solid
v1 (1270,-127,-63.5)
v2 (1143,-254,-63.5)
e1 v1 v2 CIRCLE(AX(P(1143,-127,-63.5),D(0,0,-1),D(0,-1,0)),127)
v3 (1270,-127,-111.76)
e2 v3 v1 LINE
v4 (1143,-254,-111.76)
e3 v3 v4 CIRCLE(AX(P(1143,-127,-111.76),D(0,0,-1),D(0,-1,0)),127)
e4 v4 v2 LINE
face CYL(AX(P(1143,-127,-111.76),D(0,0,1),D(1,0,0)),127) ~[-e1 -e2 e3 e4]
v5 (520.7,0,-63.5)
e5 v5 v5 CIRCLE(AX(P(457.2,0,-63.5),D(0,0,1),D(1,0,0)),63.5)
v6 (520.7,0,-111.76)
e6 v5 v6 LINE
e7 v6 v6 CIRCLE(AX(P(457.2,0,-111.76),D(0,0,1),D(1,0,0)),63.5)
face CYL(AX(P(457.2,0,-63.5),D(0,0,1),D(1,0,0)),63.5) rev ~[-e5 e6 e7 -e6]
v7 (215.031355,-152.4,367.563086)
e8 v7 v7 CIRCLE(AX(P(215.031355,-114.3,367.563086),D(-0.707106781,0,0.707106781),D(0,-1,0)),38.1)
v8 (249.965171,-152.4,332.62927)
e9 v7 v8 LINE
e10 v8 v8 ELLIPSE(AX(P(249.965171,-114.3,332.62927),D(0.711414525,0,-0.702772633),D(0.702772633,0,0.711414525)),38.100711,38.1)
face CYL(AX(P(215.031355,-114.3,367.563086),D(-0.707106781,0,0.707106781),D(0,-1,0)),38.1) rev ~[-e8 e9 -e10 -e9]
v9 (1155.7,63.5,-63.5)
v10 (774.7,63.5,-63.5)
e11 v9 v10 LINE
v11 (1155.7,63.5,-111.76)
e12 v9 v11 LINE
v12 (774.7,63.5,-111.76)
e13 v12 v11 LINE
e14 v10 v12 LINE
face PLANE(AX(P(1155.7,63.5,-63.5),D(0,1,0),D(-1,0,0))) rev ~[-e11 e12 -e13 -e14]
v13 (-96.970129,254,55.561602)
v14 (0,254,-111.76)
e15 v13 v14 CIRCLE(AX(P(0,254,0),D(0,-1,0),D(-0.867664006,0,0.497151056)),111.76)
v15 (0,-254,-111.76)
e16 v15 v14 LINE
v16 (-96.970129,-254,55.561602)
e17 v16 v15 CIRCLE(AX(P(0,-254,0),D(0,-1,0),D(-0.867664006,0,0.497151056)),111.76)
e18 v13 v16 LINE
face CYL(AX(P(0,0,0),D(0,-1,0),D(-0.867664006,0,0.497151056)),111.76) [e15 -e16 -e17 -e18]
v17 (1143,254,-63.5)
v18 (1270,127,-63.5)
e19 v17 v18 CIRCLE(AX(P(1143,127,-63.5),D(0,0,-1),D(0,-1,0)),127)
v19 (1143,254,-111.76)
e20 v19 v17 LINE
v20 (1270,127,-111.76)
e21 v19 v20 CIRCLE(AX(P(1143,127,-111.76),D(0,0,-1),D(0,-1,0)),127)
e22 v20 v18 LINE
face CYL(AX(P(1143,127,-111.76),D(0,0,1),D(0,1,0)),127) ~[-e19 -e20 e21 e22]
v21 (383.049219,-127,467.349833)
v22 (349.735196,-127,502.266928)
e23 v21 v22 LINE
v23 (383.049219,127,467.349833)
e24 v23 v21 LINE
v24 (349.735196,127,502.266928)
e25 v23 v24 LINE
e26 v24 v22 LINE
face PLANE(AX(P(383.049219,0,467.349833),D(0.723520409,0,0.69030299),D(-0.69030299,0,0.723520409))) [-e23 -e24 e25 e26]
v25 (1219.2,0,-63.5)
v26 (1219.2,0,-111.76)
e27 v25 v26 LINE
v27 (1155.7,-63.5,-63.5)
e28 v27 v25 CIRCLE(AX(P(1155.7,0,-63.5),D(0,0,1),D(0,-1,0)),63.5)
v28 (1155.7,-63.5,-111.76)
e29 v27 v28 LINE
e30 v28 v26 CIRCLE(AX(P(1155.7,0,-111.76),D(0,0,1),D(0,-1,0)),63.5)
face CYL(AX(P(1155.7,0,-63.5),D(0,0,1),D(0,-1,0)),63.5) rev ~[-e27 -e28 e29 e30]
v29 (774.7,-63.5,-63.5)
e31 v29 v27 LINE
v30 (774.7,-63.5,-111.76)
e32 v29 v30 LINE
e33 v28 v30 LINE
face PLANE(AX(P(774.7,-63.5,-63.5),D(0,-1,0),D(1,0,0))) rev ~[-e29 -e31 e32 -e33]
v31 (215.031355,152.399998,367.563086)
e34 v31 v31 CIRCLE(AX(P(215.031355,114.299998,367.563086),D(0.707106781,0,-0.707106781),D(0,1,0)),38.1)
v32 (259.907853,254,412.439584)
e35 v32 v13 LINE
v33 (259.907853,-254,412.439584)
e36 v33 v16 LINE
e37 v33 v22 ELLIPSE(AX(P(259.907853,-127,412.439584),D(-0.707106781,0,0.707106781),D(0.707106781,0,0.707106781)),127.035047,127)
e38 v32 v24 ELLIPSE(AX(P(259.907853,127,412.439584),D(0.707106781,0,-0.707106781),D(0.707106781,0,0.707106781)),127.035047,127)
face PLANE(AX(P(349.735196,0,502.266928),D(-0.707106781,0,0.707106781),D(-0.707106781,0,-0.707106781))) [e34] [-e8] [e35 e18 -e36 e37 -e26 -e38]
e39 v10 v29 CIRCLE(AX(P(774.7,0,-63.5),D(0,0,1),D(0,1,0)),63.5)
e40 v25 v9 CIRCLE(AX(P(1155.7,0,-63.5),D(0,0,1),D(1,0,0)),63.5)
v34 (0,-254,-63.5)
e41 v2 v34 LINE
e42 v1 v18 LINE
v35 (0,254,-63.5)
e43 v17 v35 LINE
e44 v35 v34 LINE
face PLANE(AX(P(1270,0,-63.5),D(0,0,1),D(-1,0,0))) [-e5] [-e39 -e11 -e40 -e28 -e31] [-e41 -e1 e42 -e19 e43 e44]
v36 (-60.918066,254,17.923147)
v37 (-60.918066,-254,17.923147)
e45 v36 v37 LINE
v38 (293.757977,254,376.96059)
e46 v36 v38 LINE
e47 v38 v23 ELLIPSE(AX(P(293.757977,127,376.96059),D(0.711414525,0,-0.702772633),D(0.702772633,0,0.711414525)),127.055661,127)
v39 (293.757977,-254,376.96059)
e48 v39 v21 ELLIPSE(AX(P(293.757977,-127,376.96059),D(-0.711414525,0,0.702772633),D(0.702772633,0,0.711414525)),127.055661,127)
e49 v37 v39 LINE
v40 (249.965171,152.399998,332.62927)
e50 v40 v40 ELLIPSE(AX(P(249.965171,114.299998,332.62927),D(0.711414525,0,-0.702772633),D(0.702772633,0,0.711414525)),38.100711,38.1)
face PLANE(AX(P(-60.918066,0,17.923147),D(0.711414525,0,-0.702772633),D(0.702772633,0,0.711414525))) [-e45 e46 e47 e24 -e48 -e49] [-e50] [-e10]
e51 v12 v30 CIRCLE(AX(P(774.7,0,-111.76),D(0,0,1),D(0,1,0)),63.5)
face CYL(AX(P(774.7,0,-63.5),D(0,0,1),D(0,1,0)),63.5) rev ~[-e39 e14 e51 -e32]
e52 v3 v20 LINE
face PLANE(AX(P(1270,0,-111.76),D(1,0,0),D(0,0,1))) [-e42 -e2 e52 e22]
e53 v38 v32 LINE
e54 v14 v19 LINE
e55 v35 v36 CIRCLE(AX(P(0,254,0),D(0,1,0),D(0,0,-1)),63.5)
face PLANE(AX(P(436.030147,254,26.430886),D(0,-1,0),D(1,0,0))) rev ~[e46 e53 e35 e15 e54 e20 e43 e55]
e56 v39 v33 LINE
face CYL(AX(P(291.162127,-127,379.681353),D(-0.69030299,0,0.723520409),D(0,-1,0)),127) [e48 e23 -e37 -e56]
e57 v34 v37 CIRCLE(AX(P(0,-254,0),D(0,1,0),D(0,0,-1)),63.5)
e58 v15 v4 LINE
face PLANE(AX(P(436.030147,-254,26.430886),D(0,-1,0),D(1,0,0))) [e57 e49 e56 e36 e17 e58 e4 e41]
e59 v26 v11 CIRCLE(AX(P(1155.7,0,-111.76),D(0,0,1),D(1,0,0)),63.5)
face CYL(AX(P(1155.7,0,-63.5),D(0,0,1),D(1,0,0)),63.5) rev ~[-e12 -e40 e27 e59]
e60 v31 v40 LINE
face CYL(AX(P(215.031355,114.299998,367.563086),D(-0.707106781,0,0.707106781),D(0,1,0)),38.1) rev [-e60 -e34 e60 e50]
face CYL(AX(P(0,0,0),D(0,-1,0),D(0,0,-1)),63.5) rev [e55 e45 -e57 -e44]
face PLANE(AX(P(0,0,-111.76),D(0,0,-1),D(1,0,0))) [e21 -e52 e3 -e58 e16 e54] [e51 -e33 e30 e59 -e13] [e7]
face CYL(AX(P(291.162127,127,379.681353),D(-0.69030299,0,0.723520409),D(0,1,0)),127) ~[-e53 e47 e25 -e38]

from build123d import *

# Parameters (mm, degrees)
F1_DEPTH = 254
F2_R     = 63.5
F3_DEPTH = 48.261
F4_R     = 38.1
F5_DEPTH = 49.6377001669
F6_R     = 127
F7_R     = 127


# Not quite as in the source:
# - a pattern or mirror of a feature is missing from the dataset's text; its kind, count and spacing are read off the source's solid


with BuildPart() as f1:
    # F0 (on Front) → F1 (new body, symmetric)
    with BuildSketch(Plane.XZ):
        with BuildLine():
            Line((1270, -63.5), (0, -63.5))
            ThreePointArc((0, -63.5), (-50.8447137485, -38.0403086717), (-60.9180663091, 17.9231469658))
            Line((-60.9180663091, 17.9231469658), (383.0492185975, 467.3498327088))
            Line((383.0492185975, 467.3498327088), (349.7351963182, 502.2669276563))
            Line((349.7351963182, 502.2669276563), (-96.9701293302, 55.5616020078))
            ThreePointArc((-96.9701293302, 55.5616020078), (-96.6950418594, -56.0389728653), (0, -111.76))
            Line((0, -111.76), (1270, -111.76))
            Line((1270, -111.76), (1270, -63.5))
        make_face()
    extrude(amount=F1_DEPTH, both=True)

    # F2 (on face) → F3 (cut, through all)
    with BuildSketch(Plane.XY.offset(-63.5)):
        with BuildLine():
            ThreePointArc((1155.7, -63.5), (1200.6012806053, -44.9012806053), (1219.2, 0))
            ThreePointArc((1219.2, 0), (1200.6012806053, 44.9012806053), (1155.7, 63.5))
            ThreePointArc((1155.7, 63.5), (1092.2, 0), (1155.7, -63.5))
        make_face()
        with BuildLine():
            ThreePointArc((1155.7, -63.5), (1092.2, 0), (1155.7, 63.5))
            Line((1155.7, 63.5), (774.7, 63.5))
            ThreePointArc((774.7, 63.5), (819.6012806053, 44.9012806053), (838.2, 0))
            ThreePointArc((838.2, 0), (819.6012806053, -44.9012806053), (774.7, -63.5))
            Line((774.7, -63.5), (1155.7, -63.5))
        make_face()
        with BuildLine():
            ThreePointArc((838.2, 0), (819.6012806053, 44.9012806053), (774.7, 63.5))
            ThreePointArc((774.7, 63.5), (711.2, 0), (774.7, -63.5))
            ThreePointArc((774.7, -63.5), (819.6012806053, -44.9012806053), (838.2, 0))
        make_face()
        with Locations((457.2, 0)):
            Circle(F2_R)
    extrude(amount=-F3_DEPTH, mode=Mode.SUBTRACT)

    # F4 (on face) → F5 (cut, through all)
    with BuildSketch(Plane(origin=(-76.265865669, 0, 76.265865669), x_dir=(0, -1, 0), z_dir=(-0.7071067812, 0, 0.7071067812))):
        with Locations((114.3, 411.9564794477)):
            Circle(F4_R)
    f5 = extrude(amount=-F5_DEPTH, mode=Mode.SUBTRACT)

    # F5_copies: F5 across plane
    add(f5.mirror(Plane.ZX.offset(-1e-06)), mode=Mode.SUBTRACT)

    # F6
    f6_edges = [f1.edges().sort_by_distance(p)[0] for p in [
        (366.392207, 254, 484.80838),
        (366.392207, -254, 484.80838),
    ]]
    fillet(f6_edges, radius=F6_R)

    # F7
    f7_edges = [f1.edges().sort_by_distance(p)[0] for p in [
        (1270, 254, -87.63),
        (1270, -254, -87.63),
    ]]
    fillet(f7_edges, radius=F7_R)


solid = f1.part
